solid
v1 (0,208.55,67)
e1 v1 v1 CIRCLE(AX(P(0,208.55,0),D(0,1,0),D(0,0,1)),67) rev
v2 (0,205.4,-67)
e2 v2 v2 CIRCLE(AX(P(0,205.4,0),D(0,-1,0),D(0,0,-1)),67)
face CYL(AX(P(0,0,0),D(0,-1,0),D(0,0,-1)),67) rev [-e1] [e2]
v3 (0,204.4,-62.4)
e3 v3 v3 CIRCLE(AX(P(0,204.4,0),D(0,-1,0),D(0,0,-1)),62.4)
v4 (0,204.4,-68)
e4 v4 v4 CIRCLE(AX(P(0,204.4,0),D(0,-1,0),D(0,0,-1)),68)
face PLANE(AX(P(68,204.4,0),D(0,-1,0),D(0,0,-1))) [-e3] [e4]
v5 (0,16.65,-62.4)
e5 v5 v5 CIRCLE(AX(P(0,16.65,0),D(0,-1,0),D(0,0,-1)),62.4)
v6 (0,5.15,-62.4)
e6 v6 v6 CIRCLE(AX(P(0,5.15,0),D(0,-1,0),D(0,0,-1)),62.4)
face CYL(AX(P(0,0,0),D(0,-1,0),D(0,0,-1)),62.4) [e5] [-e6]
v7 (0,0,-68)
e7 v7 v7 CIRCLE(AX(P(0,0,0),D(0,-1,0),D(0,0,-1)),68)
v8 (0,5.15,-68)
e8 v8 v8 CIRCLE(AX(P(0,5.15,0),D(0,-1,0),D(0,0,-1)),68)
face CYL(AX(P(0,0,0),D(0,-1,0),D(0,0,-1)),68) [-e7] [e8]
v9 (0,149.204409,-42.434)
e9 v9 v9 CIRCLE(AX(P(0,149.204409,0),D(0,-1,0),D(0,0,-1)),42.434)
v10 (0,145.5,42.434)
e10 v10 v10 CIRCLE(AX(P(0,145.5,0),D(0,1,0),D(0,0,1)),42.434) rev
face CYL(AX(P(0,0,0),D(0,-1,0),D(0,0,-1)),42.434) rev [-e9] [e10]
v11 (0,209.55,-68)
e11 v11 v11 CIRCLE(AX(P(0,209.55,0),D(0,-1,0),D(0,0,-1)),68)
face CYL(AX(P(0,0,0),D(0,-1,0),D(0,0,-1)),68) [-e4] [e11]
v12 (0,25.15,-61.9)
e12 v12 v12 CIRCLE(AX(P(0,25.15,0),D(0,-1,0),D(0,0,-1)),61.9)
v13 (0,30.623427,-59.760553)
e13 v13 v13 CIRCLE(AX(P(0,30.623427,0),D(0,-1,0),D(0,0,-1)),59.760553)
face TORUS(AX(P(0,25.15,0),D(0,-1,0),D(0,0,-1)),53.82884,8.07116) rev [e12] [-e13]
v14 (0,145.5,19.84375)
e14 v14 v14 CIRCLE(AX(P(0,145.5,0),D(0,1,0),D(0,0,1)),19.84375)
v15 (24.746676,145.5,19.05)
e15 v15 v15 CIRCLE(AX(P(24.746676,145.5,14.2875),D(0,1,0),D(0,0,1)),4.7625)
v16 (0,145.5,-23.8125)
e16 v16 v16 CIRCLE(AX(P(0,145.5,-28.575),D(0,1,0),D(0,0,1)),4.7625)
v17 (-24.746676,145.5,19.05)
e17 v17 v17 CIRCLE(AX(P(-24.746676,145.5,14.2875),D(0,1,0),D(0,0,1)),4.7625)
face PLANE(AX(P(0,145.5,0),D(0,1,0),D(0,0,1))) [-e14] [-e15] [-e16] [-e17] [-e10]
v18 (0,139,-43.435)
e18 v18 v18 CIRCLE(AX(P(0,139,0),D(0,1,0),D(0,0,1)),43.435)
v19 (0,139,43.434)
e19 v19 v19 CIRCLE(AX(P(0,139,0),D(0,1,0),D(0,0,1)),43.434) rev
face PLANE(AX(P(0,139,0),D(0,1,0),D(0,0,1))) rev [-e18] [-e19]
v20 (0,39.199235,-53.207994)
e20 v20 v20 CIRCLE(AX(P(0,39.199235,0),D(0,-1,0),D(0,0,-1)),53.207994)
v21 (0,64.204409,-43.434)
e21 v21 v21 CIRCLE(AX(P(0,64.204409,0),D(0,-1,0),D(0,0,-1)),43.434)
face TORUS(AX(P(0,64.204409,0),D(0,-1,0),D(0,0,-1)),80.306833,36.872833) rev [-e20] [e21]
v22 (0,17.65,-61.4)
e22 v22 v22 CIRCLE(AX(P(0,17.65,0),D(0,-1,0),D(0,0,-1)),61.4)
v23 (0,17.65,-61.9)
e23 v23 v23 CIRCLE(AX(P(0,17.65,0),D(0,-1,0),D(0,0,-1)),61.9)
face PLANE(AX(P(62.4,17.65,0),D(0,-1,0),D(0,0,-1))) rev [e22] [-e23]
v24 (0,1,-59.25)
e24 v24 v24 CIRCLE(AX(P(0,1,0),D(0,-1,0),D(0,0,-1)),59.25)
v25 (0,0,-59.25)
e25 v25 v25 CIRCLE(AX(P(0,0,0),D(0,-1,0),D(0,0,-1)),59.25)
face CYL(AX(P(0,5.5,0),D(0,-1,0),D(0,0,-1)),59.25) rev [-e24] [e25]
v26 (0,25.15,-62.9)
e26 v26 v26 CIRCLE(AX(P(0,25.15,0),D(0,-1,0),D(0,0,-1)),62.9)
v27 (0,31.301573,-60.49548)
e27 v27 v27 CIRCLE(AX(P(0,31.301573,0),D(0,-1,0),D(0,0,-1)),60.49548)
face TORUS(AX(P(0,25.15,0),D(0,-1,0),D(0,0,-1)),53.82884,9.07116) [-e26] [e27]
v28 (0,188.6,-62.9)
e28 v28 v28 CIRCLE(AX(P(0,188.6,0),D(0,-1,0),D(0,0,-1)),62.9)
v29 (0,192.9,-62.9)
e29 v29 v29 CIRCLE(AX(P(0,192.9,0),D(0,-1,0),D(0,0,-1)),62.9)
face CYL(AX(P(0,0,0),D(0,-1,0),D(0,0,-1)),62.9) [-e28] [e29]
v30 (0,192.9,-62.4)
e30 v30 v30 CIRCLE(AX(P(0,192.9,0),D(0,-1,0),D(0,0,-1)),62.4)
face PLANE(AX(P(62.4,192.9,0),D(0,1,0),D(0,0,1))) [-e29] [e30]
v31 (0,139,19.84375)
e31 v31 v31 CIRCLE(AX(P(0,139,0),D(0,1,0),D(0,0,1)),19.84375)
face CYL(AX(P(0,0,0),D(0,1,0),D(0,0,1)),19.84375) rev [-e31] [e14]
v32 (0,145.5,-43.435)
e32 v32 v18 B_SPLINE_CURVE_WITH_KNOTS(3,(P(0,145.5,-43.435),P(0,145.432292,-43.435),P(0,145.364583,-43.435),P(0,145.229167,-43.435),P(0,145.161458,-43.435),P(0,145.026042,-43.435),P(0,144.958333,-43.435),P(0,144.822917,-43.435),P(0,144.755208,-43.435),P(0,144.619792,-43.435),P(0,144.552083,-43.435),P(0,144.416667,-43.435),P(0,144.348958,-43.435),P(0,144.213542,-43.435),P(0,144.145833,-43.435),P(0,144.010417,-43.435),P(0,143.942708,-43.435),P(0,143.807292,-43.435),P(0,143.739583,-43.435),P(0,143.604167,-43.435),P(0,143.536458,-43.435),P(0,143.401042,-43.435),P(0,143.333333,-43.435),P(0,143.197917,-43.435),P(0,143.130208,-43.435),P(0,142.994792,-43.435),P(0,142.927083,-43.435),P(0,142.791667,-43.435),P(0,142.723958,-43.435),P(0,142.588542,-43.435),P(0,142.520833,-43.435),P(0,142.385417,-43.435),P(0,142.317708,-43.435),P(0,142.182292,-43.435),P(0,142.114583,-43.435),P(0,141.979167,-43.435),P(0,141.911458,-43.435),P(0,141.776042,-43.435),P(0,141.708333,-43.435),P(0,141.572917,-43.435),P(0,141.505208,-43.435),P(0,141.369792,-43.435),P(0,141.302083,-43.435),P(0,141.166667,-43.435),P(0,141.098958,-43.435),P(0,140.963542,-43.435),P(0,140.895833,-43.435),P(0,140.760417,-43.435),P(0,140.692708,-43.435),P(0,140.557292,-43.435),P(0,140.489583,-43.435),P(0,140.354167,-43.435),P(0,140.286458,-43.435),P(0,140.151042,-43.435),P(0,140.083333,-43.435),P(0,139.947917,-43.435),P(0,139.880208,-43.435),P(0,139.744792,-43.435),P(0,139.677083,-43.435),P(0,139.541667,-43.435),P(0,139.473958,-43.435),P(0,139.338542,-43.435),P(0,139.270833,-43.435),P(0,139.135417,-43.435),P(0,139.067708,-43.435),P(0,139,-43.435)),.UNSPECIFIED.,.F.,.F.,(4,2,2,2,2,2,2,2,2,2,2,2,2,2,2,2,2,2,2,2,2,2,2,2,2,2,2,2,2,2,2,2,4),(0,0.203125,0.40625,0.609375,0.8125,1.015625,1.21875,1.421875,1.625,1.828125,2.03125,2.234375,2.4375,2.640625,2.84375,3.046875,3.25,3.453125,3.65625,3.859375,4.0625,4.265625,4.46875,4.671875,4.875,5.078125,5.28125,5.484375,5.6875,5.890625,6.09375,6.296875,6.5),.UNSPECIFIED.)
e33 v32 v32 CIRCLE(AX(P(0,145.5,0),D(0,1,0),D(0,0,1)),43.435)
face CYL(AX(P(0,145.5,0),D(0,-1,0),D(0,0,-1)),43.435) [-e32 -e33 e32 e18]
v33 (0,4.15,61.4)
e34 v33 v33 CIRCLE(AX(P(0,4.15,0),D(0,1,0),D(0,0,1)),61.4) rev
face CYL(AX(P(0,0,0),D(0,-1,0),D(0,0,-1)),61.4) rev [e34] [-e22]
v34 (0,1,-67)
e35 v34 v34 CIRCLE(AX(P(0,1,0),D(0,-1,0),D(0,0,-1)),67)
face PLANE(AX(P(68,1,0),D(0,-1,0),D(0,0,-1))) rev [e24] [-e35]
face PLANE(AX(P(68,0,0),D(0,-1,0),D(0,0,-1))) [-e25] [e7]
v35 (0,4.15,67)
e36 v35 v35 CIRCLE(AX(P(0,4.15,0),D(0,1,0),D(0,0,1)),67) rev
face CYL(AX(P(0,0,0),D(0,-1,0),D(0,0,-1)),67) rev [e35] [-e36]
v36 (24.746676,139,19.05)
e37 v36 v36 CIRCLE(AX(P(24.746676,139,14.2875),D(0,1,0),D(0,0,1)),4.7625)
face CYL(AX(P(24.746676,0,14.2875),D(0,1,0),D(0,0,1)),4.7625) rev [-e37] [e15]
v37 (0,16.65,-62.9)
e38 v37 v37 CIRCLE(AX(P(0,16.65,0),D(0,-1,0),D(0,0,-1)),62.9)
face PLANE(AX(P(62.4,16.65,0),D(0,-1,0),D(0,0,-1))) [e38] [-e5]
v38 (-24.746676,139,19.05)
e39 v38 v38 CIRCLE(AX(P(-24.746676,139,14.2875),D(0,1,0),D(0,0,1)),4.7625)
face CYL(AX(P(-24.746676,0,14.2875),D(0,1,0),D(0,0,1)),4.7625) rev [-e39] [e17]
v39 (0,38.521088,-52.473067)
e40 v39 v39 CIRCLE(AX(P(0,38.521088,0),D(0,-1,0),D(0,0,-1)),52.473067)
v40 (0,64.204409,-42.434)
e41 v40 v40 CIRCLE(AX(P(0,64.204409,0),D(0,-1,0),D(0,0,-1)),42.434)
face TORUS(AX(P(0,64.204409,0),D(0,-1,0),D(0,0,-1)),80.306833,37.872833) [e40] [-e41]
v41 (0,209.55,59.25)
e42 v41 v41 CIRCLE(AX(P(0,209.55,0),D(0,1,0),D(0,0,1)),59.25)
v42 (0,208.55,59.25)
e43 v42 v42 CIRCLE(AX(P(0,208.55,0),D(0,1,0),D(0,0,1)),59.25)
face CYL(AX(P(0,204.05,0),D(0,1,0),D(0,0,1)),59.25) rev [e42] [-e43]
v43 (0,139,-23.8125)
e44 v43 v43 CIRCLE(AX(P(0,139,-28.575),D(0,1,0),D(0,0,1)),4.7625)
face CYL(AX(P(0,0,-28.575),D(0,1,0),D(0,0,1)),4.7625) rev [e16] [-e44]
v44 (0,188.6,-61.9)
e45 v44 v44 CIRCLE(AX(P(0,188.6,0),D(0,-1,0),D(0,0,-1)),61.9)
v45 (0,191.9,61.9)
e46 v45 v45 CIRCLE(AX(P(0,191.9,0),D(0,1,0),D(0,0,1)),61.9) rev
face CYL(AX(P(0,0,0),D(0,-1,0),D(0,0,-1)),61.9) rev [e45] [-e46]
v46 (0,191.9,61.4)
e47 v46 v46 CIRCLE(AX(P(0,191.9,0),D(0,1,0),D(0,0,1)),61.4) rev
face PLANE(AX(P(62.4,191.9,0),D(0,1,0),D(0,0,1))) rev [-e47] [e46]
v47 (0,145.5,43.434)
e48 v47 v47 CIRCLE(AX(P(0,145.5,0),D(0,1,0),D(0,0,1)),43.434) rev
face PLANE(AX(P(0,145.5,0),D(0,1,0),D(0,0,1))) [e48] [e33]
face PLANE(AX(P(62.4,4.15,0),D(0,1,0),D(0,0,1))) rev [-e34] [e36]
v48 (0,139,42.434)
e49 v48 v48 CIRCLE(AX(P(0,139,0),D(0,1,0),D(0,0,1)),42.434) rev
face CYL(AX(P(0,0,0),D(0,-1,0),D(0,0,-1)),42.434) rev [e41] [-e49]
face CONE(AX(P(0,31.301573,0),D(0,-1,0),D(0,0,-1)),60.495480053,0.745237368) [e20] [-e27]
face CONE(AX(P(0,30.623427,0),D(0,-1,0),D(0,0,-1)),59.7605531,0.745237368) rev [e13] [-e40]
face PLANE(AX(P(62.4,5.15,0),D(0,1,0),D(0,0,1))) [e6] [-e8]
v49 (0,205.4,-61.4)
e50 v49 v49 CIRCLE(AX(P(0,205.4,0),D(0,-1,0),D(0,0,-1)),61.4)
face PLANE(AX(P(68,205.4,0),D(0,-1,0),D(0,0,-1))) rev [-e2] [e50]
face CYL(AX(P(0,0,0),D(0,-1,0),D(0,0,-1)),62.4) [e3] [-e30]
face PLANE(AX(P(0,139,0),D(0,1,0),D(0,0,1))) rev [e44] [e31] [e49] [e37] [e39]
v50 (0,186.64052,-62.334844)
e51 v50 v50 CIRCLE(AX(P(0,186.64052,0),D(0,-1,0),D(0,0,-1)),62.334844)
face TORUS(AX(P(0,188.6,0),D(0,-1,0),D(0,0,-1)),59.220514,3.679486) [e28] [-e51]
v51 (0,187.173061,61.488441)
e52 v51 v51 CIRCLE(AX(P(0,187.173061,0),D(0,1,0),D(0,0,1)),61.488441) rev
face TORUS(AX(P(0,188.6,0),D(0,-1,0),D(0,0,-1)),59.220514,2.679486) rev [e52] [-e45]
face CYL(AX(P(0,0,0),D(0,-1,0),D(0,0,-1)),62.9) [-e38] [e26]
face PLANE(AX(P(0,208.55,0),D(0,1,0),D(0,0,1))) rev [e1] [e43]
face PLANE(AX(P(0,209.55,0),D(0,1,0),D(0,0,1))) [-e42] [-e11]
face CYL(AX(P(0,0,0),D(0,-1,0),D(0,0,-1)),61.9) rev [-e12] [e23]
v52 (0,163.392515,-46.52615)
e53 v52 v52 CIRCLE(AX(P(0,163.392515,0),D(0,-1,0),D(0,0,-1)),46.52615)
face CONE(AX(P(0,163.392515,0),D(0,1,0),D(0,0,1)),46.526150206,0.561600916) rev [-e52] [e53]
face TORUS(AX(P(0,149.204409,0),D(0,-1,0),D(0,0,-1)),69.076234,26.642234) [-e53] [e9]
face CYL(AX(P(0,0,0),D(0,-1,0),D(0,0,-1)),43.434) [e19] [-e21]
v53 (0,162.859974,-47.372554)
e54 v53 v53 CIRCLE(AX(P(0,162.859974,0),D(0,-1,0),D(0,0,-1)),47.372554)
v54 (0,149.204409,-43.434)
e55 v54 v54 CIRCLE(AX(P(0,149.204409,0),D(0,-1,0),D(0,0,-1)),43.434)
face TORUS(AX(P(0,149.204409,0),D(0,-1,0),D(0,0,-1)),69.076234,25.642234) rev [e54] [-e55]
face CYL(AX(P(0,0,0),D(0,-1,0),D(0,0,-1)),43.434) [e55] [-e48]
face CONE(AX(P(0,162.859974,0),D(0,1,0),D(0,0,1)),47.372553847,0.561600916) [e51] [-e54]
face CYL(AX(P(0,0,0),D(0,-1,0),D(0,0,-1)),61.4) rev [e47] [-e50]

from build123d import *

# Parameters (mm, degrees)
SKETCH8_R               = 59.25
CUT_EXTRUDE4_DEPTH      = 5.5
CUT_EXTRUDE5_START      = -5.5
SKETCH9_R               = 59.25
CUT_EXTRUDE5_DEPTH      = 5.5
SKETCH11_R              = 43.435
BOSS_EXTRUDE1_DEPTH     = 6.5
CUT_EXTRUDE6_DEPTH      = 175.408285354
CUT_EXTRUDE6_DEPTH_BACK = 175.408285354
SKETCH12_R              = 19.84375
CUT_EXTRUDE7_DEPTH      = 175.408285354
CUT_EXTRUDE7_DEPTH_BACK = 175.408285354
SKETCH13_R              = 4.7625


# Read off the part's stored shape, not the designer's step: Shell3
with BuildPart() as part:
    # Sketch1 → Revolve1 (revolve)
    with BuildSketch(Plane.XY, mode=Mode.PRIVATE) as revolve1_sk:
        with BuildLine():
            Line((0, 209.55), (68, 209.55))
            Line((68, 209.55), (68, 204.4))
            Line((68, 204.4), (62.4, 204.4))
            Line((62.4, 204.4), (62.4, 192.9))
            Line((62.4, 192.9), (62.9, 192.9))
            Line((62.9, 192.9), (62.9, 188.6))
            ThreePointArc((62.9, 188.6), (62.755888959, 187.580323047), (62.334844366, 186.640519594))
            Line((62.334844366, 186.640519594), (47.372553847, 162.859973589))
            ThreePointArc((47.372553847, 162.859973589), (44.438305823, 156.31050954), (43.434, 149.204409302))
            Line((43.434, 149.204409302), (43.434, 64.204409302))
            ThreePointArc((43.434, 64.204409302), (45.964317306, 50.780645643), (53.207994273, 39.199234658))
            Line((53.207994273, 39.199234658), (60.495480053, 31.301573198))
            ThreePointArc((60.495480053, 31.301573198), (62.277511561, 28.452407038), (62.9, 25.15))
            Line((62.9, 25.15), (62.9, 16.65))
            Line((62.9, 16.65), (62.4, 16.65))
            Line((62.4, 16.65), (62.4, 5.15))
            Line((62.4, 5.15), (68, 5.15))
            Line((68, 5.15), (68, 0))
            Line((68, 0), (0, 0))
            Line((0, 0), (0, 209.55))
        make_face()
    revolve(revolve1_sk.sketch.rotate(Axis((0, 0, 0), (0, 1, 0)), 90), axis=Axis((0, 0, 0), (0, 1, 0)))

    # Shell3 outline → Shell3 (revolve, cut)
    with BuildSketch(Plane.XY):
        with BuildLine():
            Line((0, 208.55), (0, 1))
            Line((0, 1), (67, 1))
            Line((67, 1), (67, 4.15))
            Line((67, 4.15), (61.4, 4.15))
            Line((61.4, 4.15), (61.4, 17.65))
            Line((61.4, 17.65), (61.9, 17.65))
            Line((61.9, 17.65), (61.9, 25.15))
            ThreePointArc((61.9, 25.15), (61.346134368, 28.088351379), (59.7605531, 30.623426921))
            Line((59.7605531, 30.623426921), (52.47306732, 38.52108838))
            ThreePointArc((52.47306732, 38.52108838), (45.032940112, 50.416589983), (42.434, 64.204409302))
            Line((42.434, 64.204409302), (42.434, 149.204409302))
            ThreePointArc((42.434, 149.204409302), (43.477471904, 156.587634385), (46.526150206, 163.39251549))
            Line((46.526150206, 163.39251549), (61.488440725, 187.173061495))
            ThreePointArc((61.488440725, 187.173061495), (61.79505504, 187.857447892), (61.9, 188.6))
            Line((61.9, 188.6), (61.9, 191.9))
            Line((61.9, 191.9), (61.4, 191.9))
            Line((61.4, 191.9), (61.4, 205.4))
            Line((61.4, 205.4), (67, 205.4))
            Line((67, 205.4), (67, 208.55))
            Line((67, 208.55), (0, 208.55))
        make_face()
    revolve(axis=Axis((0, 0, 0), (0, 1, 0)), mode=Mode.SUBTRACT)

    # Sketch8 → Cut-Extrude4 (cut)
    with BuildSketch(Plane.XZ):
        with Locations(Location((0, 0, 0), (0, 0, 270))):
            Circle(SKETCH8_R)
    extrude(amount=-CUT_EXTRUDE4_DEPTH, mode=Mode.SUBTRACT)

    # Sketch9 → Cut-Extrude5 (cut)
    with BuildSketch(Plane(origin=(0, 209.55, 0), x_dir=(1, 0, 0), z_dir=(0, 1, 0)).offset(CUT_EXTRUDE5_START)):
        with Locations(Location((0, 0, 0), (0, 0, 90))):
            Circle(SKETCH9_R)
    extrude(amount=CUT_EXTRUDE5_DEPTH, mode=Mode.SUBTRACT)

    # Sketch11 → Boss-Extrude1 (add)
    with BuildSketch(Plane(origin=(0, 139, 0), x_dir=(1, 0, 0), z_dir=(0, 1, 0))):
        with Locations(Location((0, 0, 0), (0, 0, 90))):
            Circle(SKETCH11_R)
    extrude(amount=BOSS_EXTRUDE1_DEPTH)

    # Sketch12 → Cut-Extrude6 (cut, two sides: drawn at the far end of the back side and taken through both)
    with BuildSketch(Plane(origin=(0, 145.5, 0), x_dir=(1, 0, 0), z_dir=(0, 1, 0)).offset(-CUT_EXTRUDE6_DEPTH_BACK)):
        with Locations(Location((0, 0, 0), (0, 0, 270))):
            Circle(SKETCH12_R)
    extrude(amount=CUT_EXTRUDE6_DEPTH + CUT_EXTRUDE6_DEPTH_BACK, mode=Mode.SUBTRACT)

    # Sketch13 → Cut-Extrude7 (cut, two sides: drawn at the far end of the back side and taken through both)
    with BuildSketch(Plane(origin=(0, 145.5, 0), x_dir=(1, 0, 0), z_dir=(0, 1, 0)).offset(-CUT_EXTRUDE7_DEPTH_BACK)):
        with Locations(Location((0, 28.575, 0), (0, 0, 270))):
            Circle(SKETCH13_R)
        with Locations(Location((24.746675913, -14.2875, 0), (0, 0, 270))):
            Circle(SKETCH13_R)
        with Locations(Location((-24.746675913, -14.2875, 0), (0, 0, 270))):
            Circle(SKETCH13_R)
    extrude(amount=CUT_EXTRUDE7_DEPTH + CUT_EXTRUDE7_DEPTH_BACK, mode=Mode.SUBTRACT)


solid = part.part
